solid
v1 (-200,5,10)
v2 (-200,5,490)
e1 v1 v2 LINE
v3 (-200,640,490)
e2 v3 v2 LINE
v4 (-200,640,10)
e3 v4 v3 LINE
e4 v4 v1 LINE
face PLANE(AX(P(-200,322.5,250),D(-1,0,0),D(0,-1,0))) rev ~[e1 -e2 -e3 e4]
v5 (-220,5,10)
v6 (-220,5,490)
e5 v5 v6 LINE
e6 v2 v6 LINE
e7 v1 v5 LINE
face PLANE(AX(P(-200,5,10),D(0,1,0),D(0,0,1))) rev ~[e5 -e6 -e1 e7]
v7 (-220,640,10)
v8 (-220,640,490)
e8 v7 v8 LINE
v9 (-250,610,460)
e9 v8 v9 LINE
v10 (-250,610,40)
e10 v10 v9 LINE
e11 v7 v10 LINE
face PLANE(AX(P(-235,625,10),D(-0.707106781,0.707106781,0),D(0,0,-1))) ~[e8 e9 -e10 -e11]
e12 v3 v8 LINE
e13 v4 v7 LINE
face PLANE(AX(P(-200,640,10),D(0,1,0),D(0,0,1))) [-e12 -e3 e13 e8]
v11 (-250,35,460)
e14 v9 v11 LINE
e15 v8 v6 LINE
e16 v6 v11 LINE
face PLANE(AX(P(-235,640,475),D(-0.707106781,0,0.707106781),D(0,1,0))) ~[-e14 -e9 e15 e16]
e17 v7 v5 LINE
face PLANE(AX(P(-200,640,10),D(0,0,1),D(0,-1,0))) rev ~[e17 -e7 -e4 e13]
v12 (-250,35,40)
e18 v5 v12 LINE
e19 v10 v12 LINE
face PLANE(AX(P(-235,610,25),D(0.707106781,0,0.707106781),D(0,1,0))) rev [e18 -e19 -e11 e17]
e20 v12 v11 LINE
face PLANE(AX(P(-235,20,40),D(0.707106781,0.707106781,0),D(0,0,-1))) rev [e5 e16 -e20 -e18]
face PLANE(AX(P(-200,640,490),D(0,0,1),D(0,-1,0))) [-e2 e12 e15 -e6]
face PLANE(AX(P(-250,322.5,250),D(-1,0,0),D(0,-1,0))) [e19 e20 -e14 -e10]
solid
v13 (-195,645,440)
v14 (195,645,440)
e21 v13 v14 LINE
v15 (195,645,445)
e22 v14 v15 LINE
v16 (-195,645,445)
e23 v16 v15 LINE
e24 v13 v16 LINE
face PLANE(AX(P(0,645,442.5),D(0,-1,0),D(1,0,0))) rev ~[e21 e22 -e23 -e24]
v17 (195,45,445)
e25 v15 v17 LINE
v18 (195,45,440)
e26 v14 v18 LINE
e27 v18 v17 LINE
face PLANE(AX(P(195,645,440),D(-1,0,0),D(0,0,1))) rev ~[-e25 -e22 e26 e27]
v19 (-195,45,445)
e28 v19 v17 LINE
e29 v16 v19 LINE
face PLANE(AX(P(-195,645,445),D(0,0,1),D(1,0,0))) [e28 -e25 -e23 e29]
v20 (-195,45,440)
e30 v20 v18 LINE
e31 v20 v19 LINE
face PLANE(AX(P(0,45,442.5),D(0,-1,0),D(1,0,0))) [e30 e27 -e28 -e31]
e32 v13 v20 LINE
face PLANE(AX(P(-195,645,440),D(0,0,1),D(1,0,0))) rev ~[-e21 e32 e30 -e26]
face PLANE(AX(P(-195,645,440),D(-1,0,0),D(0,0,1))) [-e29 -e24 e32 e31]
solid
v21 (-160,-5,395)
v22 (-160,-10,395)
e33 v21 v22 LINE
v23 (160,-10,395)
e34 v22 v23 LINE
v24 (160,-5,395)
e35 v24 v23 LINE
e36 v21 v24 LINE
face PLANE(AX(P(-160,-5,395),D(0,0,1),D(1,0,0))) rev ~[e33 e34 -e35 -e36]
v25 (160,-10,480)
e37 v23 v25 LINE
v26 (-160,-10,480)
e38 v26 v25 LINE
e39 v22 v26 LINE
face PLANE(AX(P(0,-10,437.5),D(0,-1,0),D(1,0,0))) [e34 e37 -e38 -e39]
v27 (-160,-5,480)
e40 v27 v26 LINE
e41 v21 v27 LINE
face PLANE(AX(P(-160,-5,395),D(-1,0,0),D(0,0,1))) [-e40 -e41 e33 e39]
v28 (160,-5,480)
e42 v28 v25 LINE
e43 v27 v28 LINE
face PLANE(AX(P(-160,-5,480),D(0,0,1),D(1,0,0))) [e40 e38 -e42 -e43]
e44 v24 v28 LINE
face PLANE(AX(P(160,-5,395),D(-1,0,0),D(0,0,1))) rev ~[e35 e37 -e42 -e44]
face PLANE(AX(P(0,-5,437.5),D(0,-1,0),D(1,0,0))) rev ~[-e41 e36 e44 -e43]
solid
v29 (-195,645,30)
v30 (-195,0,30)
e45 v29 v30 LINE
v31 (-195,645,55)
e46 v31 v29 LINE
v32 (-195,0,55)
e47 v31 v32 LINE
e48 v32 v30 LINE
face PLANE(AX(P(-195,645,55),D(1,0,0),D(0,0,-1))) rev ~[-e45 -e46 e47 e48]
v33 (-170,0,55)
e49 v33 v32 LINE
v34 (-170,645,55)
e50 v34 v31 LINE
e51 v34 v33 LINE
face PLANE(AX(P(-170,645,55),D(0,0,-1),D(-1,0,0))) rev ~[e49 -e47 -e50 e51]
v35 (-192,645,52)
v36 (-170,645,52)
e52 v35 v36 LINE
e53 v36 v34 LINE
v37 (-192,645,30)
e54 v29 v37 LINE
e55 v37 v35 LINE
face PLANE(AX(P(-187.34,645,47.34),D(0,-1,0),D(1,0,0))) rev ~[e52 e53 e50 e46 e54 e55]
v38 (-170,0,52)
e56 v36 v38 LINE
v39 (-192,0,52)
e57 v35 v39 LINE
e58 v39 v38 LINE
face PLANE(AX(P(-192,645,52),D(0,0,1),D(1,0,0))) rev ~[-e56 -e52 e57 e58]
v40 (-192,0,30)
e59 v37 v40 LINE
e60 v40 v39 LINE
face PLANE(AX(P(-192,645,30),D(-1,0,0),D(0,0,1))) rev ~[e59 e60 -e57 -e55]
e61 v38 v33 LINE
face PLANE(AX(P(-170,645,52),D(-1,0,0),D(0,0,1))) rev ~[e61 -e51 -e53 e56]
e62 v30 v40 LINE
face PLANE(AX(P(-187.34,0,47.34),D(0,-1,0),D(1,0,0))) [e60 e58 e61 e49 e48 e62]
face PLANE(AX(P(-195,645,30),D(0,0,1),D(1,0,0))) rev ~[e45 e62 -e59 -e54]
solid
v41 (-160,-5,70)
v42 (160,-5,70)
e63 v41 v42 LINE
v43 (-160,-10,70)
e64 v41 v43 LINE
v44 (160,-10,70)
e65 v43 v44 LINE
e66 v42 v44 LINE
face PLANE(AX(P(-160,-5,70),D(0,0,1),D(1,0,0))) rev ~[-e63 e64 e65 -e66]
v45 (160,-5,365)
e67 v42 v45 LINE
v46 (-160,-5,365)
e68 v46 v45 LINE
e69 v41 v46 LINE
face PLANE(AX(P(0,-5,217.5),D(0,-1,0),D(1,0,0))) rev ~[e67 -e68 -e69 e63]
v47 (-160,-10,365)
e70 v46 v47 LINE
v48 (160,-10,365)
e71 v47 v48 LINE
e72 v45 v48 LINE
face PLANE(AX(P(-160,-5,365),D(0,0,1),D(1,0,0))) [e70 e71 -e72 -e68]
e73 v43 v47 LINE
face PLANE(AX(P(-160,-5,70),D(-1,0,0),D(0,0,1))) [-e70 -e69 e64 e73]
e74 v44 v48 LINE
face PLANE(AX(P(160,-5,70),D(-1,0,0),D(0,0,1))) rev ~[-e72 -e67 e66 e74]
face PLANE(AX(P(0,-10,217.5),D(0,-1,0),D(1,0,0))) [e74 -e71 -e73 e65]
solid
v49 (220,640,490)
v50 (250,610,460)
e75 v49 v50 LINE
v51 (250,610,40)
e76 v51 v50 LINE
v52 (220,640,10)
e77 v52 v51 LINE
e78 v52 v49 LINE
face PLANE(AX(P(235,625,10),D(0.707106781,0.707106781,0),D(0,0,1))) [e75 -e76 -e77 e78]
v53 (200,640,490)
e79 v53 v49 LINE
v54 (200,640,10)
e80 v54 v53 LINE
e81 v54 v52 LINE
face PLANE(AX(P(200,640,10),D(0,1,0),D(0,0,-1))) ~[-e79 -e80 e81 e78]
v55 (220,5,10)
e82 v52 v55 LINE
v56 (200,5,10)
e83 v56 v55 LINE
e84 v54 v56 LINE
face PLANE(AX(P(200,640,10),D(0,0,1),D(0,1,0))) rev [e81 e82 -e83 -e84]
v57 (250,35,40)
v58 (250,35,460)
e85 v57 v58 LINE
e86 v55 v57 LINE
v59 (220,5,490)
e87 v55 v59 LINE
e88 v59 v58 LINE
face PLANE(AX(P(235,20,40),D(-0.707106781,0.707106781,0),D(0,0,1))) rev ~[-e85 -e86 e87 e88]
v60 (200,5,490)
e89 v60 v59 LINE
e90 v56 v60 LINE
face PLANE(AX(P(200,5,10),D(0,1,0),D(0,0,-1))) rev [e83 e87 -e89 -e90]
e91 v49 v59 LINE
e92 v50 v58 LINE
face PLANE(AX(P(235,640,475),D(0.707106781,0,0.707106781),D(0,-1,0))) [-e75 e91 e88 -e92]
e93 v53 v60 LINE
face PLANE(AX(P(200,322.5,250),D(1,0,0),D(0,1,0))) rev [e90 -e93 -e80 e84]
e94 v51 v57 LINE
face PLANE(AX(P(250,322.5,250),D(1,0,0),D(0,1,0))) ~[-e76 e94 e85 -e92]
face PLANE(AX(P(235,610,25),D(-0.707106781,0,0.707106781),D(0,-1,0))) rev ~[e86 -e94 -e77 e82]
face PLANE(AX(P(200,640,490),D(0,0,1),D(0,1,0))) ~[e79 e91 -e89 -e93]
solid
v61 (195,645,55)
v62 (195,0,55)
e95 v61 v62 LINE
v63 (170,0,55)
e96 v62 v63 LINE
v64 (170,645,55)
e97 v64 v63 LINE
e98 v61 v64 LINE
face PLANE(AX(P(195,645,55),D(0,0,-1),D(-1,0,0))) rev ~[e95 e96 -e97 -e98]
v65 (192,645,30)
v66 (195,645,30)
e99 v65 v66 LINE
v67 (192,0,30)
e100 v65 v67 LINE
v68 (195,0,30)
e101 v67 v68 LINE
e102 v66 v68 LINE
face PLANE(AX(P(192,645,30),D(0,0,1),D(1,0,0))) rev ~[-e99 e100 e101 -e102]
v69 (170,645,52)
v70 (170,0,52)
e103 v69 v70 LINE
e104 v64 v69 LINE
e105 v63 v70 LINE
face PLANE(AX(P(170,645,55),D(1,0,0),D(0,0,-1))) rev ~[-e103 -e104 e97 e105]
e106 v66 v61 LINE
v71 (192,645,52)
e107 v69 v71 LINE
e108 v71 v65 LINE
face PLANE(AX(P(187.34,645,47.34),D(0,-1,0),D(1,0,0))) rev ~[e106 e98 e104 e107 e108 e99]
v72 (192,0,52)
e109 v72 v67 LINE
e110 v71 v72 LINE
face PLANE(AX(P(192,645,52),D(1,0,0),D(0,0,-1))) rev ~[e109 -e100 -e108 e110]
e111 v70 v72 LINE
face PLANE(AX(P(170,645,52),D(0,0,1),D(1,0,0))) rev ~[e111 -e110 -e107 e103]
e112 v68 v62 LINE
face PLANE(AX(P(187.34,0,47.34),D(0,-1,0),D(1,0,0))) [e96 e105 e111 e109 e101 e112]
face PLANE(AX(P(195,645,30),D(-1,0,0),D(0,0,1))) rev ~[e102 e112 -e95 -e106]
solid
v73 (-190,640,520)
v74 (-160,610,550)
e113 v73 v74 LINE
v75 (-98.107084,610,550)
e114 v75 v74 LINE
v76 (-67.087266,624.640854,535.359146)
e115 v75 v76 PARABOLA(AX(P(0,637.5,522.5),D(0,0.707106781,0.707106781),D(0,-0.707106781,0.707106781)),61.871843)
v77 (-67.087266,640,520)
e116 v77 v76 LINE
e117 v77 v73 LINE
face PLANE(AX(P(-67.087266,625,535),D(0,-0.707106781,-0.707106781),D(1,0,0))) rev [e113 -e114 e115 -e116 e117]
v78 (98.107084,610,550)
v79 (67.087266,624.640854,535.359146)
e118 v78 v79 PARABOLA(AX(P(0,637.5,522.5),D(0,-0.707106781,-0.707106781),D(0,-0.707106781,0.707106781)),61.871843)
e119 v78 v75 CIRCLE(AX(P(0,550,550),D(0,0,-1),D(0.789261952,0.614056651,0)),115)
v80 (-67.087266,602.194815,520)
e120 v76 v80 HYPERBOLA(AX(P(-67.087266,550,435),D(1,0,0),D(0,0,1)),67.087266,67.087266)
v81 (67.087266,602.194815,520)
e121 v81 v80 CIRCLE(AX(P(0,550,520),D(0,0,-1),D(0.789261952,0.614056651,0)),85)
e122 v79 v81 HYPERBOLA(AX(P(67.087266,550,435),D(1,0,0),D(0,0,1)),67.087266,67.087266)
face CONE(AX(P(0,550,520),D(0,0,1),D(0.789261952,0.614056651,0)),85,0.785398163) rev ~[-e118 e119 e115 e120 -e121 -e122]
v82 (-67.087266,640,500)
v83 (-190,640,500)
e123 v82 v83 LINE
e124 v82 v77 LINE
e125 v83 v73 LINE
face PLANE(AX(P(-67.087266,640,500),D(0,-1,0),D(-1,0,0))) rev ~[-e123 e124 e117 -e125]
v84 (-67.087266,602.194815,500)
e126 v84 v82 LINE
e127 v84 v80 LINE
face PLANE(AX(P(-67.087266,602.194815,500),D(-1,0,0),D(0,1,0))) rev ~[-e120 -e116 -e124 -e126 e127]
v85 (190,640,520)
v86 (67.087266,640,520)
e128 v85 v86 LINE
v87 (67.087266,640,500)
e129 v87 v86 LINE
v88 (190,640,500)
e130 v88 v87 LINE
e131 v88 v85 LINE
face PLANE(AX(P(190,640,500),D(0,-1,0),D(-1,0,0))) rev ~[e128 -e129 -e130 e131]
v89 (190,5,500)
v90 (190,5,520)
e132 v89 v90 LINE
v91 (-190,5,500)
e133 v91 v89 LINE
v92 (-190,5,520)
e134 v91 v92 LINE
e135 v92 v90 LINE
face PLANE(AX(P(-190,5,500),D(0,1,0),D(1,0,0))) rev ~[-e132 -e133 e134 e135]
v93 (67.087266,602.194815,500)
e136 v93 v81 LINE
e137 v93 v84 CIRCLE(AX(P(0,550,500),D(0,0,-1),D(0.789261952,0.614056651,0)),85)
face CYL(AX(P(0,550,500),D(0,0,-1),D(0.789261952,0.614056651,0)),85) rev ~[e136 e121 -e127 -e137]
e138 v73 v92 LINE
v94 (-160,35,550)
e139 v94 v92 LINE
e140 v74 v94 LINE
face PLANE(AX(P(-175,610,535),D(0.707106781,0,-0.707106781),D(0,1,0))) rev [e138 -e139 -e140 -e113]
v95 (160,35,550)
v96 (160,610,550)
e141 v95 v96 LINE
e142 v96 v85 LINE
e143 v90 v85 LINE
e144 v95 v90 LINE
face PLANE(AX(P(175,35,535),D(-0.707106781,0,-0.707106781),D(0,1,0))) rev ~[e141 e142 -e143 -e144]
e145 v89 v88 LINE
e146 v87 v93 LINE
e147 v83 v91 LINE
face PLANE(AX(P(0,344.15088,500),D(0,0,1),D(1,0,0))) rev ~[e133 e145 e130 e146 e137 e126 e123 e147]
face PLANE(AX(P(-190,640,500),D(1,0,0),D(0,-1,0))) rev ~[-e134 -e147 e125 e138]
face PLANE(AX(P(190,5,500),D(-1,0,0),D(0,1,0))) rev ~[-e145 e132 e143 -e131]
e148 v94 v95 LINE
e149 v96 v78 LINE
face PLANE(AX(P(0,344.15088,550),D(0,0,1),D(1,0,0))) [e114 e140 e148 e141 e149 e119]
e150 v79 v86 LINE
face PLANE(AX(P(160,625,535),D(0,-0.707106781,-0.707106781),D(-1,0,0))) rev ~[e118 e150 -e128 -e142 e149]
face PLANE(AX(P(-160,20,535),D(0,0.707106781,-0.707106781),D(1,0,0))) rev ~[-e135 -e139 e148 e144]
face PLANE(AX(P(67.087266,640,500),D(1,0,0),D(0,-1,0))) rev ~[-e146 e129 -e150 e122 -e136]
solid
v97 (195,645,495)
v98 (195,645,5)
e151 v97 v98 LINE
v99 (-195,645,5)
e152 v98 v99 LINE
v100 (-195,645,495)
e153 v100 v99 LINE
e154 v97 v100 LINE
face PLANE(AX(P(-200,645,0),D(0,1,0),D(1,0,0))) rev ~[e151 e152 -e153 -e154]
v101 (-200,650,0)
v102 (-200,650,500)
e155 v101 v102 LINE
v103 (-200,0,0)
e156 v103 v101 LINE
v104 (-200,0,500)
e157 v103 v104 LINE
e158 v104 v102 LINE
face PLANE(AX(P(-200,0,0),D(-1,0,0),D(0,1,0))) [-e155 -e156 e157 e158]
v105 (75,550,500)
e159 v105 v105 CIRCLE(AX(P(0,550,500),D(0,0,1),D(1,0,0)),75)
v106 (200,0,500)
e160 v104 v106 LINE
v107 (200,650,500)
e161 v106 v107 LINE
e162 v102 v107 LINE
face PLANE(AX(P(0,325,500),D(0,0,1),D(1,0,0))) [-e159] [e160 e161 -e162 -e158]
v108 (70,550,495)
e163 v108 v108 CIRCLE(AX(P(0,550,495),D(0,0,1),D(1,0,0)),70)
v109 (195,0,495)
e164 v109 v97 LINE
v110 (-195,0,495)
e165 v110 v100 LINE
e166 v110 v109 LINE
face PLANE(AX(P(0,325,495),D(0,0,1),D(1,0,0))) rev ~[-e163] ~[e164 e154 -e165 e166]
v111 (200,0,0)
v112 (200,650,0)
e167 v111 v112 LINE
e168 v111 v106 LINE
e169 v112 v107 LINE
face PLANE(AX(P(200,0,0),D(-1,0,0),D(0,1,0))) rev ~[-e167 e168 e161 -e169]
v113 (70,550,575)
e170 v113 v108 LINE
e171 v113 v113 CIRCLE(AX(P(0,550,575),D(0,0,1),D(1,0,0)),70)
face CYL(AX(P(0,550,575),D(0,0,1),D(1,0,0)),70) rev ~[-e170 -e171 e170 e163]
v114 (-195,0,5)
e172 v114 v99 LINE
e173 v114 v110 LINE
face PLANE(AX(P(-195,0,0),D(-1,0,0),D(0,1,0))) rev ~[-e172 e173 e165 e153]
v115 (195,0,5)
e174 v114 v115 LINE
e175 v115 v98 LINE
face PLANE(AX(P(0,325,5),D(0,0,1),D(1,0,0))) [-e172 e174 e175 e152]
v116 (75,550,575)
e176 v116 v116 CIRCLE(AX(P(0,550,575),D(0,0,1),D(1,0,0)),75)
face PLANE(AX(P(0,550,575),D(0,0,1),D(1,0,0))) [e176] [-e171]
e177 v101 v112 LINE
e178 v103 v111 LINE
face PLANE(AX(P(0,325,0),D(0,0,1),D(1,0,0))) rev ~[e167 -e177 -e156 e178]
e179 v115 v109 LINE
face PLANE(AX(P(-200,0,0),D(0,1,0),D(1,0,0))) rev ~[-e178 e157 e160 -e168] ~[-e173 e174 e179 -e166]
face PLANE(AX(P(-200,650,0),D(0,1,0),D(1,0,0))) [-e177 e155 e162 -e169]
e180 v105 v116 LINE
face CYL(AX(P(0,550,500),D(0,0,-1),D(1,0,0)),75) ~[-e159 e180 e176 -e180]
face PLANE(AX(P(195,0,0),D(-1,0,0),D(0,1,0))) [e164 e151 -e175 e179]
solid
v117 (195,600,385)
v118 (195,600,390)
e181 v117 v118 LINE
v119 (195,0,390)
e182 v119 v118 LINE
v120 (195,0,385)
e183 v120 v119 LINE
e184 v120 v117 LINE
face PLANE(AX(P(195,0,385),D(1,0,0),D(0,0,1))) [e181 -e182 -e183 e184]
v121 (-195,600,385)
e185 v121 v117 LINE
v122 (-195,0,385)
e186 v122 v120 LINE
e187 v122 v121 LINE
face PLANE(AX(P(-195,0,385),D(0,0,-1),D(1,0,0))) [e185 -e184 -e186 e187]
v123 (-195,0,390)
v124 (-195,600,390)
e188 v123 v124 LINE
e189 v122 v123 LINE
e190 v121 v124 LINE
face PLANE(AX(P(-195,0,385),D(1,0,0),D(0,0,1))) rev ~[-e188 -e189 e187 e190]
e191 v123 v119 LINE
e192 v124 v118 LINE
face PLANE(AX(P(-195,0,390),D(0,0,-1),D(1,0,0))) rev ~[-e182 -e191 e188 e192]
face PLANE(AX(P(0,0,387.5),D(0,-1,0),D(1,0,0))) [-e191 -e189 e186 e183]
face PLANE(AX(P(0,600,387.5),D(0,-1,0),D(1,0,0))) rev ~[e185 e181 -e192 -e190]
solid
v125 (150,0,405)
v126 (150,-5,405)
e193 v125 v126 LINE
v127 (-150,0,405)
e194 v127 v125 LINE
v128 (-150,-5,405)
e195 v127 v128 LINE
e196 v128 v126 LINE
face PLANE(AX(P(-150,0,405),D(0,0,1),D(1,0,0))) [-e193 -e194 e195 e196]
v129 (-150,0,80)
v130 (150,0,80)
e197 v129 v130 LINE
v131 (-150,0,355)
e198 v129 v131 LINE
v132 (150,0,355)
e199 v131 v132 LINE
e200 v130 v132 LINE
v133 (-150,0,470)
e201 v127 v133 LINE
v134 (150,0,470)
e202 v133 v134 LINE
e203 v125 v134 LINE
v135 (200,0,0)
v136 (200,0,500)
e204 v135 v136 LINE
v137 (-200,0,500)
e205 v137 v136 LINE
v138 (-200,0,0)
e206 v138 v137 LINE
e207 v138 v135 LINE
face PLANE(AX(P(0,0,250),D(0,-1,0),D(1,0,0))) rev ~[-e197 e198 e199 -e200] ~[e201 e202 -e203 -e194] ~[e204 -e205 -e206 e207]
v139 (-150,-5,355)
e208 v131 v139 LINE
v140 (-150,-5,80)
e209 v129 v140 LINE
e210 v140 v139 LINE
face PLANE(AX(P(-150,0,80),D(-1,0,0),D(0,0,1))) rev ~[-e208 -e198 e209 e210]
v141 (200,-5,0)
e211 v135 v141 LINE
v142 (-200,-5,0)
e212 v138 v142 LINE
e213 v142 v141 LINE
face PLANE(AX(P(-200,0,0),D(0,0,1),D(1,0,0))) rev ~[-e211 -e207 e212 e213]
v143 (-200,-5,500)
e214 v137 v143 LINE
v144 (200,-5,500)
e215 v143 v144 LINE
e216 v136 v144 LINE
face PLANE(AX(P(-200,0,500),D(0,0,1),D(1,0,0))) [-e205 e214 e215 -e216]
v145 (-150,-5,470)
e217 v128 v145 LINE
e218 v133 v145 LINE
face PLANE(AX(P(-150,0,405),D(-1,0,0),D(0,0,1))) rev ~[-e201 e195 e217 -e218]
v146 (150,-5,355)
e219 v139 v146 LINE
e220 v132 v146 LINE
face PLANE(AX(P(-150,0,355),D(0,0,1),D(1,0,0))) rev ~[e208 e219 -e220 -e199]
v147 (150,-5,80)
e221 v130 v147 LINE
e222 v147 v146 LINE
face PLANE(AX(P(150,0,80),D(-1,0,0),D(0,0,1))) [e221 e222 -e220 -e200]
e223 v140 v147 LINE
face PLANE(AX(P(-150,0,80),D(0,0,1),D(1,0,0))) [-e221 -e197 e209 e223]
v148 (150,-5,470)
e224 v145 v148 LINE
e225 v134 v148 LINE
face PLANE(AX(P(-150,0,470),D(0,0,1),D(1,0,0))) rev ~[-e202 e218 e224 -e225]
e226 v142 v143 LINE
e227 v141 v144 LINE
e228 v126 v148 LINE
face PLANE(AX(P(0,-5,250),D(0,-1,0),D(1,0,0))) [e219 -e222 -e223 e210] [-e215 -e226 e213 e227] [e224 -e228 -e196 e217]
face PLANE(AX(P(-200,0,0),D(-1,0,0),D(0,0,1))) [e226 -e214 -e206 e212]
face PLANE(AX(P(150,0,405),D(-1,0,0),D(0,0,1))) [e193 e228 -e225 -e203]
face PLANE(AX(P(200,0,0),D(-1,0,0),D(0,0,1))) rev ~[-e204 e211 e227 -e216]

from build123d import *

# Parameters (mm, degrees)
F1_W          = 400
F1_H          = 650
F2_DEPTH      = 500
F3_T          = -5
F4_W          = 390
F4_H          = 5
F5_DEPTH      = 600
F6_W          = 390
F6_H          = 5
F7_DEPTH      = 600
F9_DEPTH      = 645
F10_R         = 75
F11_DEPTH     = 75
F12_R         = 70
F13_DEPTH     = 80
F14_W         = 400
F14_H         = 500
F14_W_2       = 300
F14_H_2       = 275
F14_H_3       = 65
F15_DEPTH     = 5
F16_W         = 320
F16_H         = 85
F17_DEPTH     = 5
F16_H_2       = 295
F18_W         = 635
F18_H         = 480
F19_DEPTH     = 50
F22_DEPTH     = 50
F23_C1_SIZE   = 30
F23_C2_SIZE   = 30
F23_C3_SIZE   = 30
F23_C4_SIZE   = 30
F23_2_C1_SIZE = 30
F23_2_C2_SIZE = 30
F23_2_C3_SIZE = 30
F23_2_C4_SIZE = 30
F23_2_C5_SIZE = 30
F23_2_C6_SIZE = 30
F23_3_C1_SIZE = 30
F23_3_C2_SIZE = 30
F23_3_C3_SIZE = 30
F23_3_C4_SIZE = 30


with BuildPart() as f2:
    # F1 (on Top) → F2 (new body)
    with BuildSketch(Plane.XY):
        with Locations((0, 325)):
            Rectangle(F1_W, F1_H)
    extrude(amount=F2_DEPTH)

    # F3
    f3_openings = [f2.faces().sort_by_distance(p)[0] for p in [
        (0, 0, 250),
    ]]
    offset(amount=F3_T, openings=f3_openings)

    # F10 (on face) → F11 (join)
    with BuildSketch(Plane.XY.offset(500)):
        with Locations((0, 550)):
            Circle(F10_R)
    extrude(amount=F11_DEPTH)

    # F12 (on face) → F13 (cut, through all)
    with BuildSketch(Plane.XY.offset(575)):
        with Locations((0, 550)):
            Circle(F12_R)
    extrude(amount=-F13_DEPTH, mode=Mode.SUBTRACT)


with BuildPart() as f5:
    # F4 (on face) → F5 (new body)
    with BuildSketch(Plane.XZ.offset(-645)):
        with Locations((0, 442.5)):
            Rectangle(F4_W, F4_H)
    extrude(amount=F5_DEPTH)


with BuildPart() as f7:
    # F6 (on face) → F7 (new body)
    with BuildSketch(Plane.XZ):
        with Locations((0, 387.5)):
            Rectangle(F6_W, F6_H)
    extrude(amount=-F7_DEPTH)


with BuildPart() as f9:
    # F8 (on face) → F9 (new body, through all)
    with BuildSketch(Plane.XZ.offset(-645)):
        Polygon((-170, 52), (-170, 55), (-195, 55), (-195, 30), (-192, 30), (-192, 52), align=None)
    extrude(amount=F9_DEPTH)


with BuildPart() as f9b:
    # F8 (on face) → F9, piece 2 (new body, through all)
    with BuildSketch(Plane.XZ.offset(-645)):
        Polygon((192, 30), (195, 30), (195, 55), (170, 55), (170, 52), (192, 52), align=None)
    extrude(amount=F9_DEPTH)


with BuildPart() as f15:
    # F14 (on face) → F15 (new body)
    with BuildSketch(Plane.XZ):
        with Locations((0, 250)):
            Rectangle(F14_W, F14_H)
        with Locations((0, 217.5)):
            Rectangle(F14_W_2, F14_H_2, mode=Mode.SUBTRACT)
        with Locations((0, 437.5)):
            Rectangle(F14_W_2, F14_H_3, mode=Mode.SUBTRACT)
    extrude(amount=F15_DEPTH)


with BuildPart() as f17:
    # F16 (on face) → F17 (new body)
    with BuildSketch(Plane.XZ.offset(5)):
        with Locations((0, 437.5)):
            Rectangle(F16_W, F16_H)
    extrude(amount=F17_DEPTH)


with BuildPart() as f17b:
    # F16 (on face) → F17, piece 2 (new body)
    with BuildSketch(Plane.XZ.offset(5)):
        with Locations((0, 217.5)):
            Rectangle(F16_W, F16_H_2)
    extrude(amount=F17_DEPTH)


with BuildPart() as f19:
    # F18 (on face) → F19 (new body)
    with BuildSketch(Plane(origin=(-200, 0, 0), x_dir=(0, -1, 0), z_dir=(-1, 0, 0))):
        with Locations((-322.5, 250)):
            Rectangle(F18_W, F18_H)
    extrude(amount=F19_DEPTH)


with BuildPart() as f20_1:
    # F20: instance of F19
    add(f19.part.mirror(Plane.YZ))

    # F23#3: chamfer of 30 on 4 edges, made by hand

    # F23_3_c1
    f23_3_c1_edges = [f20_1.edges().sort_by_distance(p)[0] for p in [
        (250, 322.5, 490),
    ]]
    chamfer(f23_3_c1_edges, length=F23_3_C1_SIZE)

    # F23_3_c2
    f23_3_c2_edges = [f20_1.edges().sort_by_distance(p)[0] for p in [
        (250, 640, 235),
    ]]
    chamfer(f23_3_c2_edges, length=F23_3_C2_SIZE)

    # F23_3_c3
    f23_3_c3_edges = [f20_1.edges().sort_by_distance(p)[0] for p in [
        (250, 307.5, 10),
    ]]
    chamfer(f23_3_c3_edges, length=F23_3_C3_SIZE)

    # F23_3_c4
    f23_3_c4_edges = [f20_1.edges().sort_by_distance(p)[0] for p in [
        (250, 5, 250),
    ]]
    chamfer(f23_3_c4_edges, length=F23_3_C4_SIZE)


with BuildPart() as f22:
    # F21 (on face) → F22 (new body)
    with BuildSketch(Plane.XY.offset(500)):
        with BuildLine():
            Line((-67.0872659549, 640), (-190, 640))
            Line((-190, 640), (-190, 5))
            Line((-190, 5), (190, 5))
            Line((190, 5), (190, 640))
            Line((190, 640), (67.0872659549, 640))
            Line((67.0872659549, 640), (67.0872659549, 602.1948153239))
            ThreePointArc((67.0872659549, 602.1948153239), (0, 465), (-67.0872659549, 602.1948153239))
            Line((-67.0872659549, 602.1948153239), (-67.0872659549, 640))
        make_face()
    extrude(amount=F22_DEPTH)

    # F23#2: chamfer of 30 on 8 edges, made by hand

    # F23_2_c1
    f23_2_c1_edges = [f22.edges().sort_by_distance(p)[0] for p in [
        (-128.5436329775, 640, 550),
    ]]
    chamfer(f23_2_c1_edges, length=F23_2_C1_SIZE)

    # F23_2_c2
    f23_2_c2_edges = [f22.edges().sort_by_distance(p)[0] for p in [
        (-190, 307.5, 550),
    ]]
    chamfer(f23_2_c2_edges, length=F23_2_C2_SIZE)

    # F23_2_c3
    f23_2_c3_edges = [f22.edges().sort_by_distance(p)[0] for p in [
        (15, 5, 550),
    ]]
    chamfer(f23_2_c3_edges, length=F23_2_C3_SIZE)

    # F23_2_c4
    f23_2_c4_edges = [f22.edges().sort_by_distance(p)[0] for p in [
        (190, 337.5, 550),
    ]]
    chamfer(f23_2_c4_edges, length=F23_2_C4_SIZE)

    # F23_2_c5
    f23_2_c5_edges = [f22.edges().sort_by_distance(p)[0] for p in [
        (113.5436329775, 640, 550),
    ]]
    chamfer(f23_2_c5_edges, length=F23_2_C5_SIZE)

    # F23_2_c6
    f23_2_c6_edges = [f22.edges().sort_by_distance(p)[0] for p in [
        (0, 465, 550),
    ]]
    chamfer(f23_2_c6_edges, length=F23_2_C6_SIZE)


with BuildPart() as f19_1:
    add(f19.part)

    # F23: chamfer of 30 on 4 edges, made by hand

    # F23_c1
    f23_c1_edges = [f19_1.edges().sort_by_distance(p)[0] for p in [
        (-250, 322.5, 490),
    ]]
    chamfer(f23_c1_edges, length=F23_C1_SIZE)

    # F23_c2
    f23_c2_edges = [f19_1.edges().sort_by_distance(p)[0] for p in [
        (-250, 640, 235),
    ]]
    chamfer(f23_c2_edges, length=F23_C2_SIZE)

    # F23_c3
    f23_c3_edges = [f19_1.edges().sort_by_distance(p)[0] for p in [
        (-250, 307.5, 10),
    ]]
    chamfer(f23_c3_edges, length=F23_C3_SIZE)

    # F23_c4
    f23_c4_edges = [f19_1.edges().sort_by_distance(p)[0] for p in [
        (-250, 5, 250),
    ]]
    chamfer(f23_c4_edges, length=F23_C4_SIZE)


solid = Compound([f2.part, f5.part, f7.part, f9.part, f9b.part, f15.part, f17.part, f17b.part, f20_1.part, f22.part, f19_1.part])
